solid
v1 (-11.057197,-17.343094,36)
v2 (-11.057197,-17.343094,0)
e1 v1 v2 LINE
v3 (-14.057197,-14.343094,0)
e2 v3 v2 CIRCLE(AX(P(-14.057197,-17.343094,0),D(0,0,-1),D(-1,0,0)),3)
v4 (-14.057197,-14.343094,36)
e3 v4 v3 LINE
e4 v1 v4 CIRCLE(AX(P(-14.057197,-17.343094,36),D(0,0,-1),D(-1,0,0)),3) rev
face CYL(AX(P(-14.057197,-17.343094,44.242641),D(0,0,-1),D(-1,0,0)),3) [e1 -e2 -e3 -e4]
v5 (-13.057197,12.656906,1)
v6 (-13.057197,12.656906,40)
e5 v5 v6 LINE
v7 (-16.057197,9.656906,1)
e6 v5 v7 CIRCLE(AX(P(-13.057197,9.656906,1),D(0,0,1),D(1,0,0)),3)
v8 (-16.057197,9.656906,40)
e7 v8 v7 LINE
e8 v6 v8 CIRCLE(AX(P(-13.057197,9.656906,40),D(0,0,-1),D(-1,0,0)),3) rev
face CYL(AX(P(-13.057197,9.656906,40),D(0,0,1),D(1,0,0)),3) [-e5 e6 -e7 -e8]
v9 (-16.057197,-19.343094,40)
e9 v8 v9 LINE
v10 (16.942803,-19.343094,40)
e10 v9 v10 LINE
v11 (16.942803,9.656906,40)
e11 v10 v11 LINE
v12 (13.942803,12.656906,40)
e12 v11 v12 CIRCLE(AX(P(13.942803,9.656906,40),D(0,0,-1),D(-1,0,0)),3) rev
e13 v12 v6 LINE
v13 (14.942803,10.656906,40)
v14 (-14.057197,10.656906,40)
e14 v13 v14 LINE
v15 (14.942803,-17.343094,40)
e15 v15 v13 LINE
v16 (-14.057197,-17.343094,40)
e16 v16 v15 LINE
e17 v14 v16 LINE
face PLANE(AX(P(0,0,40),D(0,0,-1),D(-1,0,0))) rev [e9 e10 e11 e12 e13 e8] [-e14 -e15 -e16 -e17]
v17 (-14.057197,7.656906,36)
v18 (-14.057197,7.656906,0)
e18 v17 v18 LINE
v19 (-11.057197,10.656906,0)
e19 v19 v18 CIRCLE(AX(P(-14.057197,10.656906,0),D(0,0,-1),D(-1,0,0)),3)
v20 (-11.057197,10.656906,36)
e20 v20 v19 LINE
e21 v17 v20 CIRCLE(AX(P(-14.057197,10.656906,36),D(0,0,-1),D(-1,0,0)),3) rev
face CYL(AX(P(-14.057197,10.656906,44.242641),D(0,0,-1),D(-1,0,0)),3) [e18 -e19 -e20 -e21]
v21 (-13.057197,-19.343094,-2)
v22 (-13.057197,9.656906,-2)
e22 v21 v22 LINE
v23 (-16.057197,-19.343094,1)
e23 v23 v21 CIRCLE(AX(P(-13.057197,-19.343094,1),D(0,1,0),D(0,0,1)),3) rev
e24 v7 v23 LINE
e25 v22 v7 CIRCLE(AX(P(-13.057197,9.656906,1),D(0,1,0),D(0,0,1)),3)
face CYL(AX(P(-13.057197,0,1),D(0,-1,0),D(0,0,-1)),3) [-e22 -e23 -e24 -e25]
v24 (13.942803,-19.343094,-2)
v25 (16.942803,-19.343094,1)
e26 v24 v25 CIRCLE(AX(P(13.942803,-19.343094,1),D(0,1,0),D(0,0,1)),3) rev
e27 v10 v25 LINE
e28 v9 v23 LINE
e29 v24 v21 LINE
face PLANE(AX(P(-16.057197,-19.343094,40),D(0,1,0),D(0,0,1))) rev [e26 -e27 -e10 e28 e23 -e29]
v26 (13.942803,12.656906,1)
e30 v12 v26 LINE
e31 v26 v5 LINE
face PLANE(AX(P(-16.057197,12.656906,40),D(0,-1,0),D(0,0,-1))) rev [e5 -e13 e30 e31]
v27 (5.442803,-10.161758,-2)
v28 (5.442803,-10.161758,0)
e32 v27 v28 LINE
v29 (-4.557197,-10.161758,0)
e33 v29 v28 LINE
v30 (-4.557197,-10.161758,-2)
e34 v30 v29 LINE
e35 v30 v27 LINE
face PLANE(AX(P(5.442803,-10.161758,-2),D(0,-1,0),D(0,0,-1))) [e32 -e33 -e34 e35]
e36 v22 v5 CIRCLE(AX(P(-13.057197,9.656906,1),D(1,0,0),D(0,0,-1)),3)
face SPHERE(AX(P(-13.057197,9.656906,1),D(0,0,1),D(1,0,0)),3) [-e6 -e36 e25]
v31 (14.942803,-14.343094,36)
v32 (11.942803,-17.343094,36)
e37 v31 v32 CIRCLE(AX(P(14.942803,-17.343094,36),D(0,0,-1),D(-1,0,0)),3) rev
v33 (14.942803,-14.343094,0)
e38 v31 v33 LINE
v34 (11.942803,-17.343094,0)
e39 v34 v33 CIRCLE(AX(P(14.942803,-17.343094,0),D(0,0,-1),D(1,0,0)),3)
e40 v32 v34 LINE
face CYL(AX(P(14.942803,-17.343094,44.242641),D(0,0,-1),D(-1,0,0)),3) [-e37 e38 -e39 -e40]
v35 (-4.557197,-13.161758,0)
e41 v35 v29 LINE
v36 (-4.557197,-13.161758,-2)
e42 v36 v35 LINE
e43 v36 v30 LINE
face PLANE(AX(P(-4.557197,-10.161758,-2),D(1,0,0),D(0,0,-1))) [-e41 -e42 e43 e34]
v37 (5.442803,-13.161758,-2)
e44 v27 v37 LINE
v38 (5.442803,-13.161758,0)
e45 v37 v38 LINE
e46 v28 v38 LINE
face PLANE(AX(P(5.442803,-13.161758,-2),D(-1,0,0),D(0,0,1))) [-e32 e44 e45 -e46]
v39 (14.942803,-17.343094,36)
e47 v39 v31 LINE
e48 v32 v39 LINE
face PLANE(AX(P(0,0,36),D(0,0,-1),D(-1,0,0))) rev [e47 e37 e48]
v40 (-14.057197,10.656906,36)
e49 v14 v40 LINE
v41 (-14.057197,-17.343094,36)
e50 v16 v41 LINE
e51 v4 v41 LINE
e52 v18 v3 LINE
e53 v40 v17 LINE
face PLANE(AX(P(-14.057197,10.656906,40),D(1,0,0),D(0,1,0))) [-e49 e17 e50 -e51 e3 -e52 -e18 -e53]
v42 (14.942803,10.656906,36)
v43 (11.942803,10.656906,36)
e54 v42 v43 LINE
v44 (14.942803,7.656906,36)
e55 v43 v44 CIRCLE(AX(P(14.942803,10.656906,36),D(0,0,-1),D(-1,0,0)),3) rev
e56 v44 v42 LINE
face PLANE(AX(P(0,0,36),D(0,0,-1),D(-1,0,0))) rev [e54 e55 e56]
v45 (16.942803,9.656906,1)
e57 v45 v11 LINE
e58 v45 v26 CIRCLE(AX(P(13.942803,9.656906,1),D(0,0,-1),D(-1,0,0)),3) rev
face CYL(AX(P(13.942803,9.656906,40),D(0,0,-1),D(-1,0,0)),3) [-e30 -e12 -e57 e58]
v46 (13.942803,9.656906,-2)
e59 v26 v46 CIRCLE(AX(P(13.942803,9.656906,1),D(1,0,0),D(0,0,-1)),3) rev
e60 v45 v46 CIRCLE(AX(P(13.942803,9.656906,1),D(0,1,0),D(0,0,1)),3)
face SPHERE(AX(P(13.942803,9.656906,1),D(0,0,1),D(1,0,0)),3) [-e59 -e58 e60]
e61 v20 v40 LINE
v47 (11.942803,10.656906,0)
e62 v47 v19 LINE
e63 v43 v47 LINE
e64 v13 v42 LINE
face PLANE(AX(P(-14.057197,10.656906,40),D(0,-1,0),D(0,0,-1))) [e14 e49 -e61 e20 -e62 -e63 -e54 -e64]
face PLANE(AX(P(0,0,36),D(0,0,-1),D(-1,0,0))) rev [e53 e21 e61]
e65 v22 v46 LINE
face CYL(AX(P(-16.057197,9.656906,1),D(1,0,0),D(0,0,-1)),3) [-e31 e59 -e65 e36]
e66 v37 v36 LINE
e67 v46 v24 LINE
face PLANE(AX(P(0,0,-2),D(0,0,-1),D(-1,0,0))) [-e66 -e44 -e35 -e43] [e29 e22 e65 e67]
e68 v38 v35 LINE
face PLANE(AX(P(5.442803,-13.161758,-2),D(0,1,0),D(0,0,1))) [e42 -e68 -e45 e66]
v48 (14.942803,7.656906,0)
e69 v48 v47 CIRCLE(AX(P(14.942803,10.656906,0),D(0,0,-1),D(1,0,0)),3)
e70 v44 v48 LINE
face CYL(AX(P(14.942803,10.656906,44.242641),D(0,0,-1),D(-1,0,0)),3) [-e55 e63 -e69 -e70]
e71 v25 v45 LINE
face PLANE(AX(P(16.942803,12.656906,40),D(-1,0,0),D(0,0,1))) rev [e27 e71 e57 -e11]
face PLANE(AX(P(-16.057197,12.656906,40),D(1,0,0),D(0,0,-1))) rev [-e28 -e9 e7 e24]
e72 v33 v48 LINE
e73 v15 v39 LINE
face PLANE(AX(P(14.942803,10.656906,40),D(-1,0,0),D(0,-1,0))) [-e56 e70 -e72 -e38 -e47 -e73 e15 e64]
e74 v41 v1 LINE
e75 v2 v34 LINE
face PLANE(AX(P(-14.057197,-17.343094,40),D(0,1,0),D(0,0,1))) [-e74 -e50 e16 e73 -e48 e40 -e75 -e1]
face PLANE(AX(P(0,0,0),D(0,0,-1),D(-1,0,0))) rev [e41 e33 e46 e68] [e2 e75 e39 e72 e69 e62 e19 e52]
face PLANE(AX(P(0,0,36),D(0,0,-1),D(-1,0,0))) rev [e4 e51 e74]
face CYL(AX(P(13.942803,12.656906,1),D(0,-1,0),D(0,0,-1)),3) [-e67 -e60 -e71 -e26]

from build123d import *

# Parameters (mm, degrees)
SKETCH_1_W      = 33
SKETCH_1_H      = 32
SKETCH_1_W_2    = 29
SKETCH_1_H_2    = 28
EXTRUDE_1_DEPTH = 40
SKETCH_2_W      = 33
SKETCH_2_H      = 32
SKETCH_2_W_2    = 10
SKETCH_2_H_2    = 3
EXTRUDE_2_DEPTH = 2
EXTRUDE_3_DEPTH = 36
FILLET_1_R      = 3
FILLET_2_R      = 3
FILLET_3_R      = 3


with BuildPart() as part:
    # 草图1 → 凸台-拉伸1 (new body)
    with BuildSketch(Plane.XY):
        with Locations((0.442802767, -3.343094476)):
            Rectangle(SKETCH_1_W, SKETCH_1_H)
        with Locations((0.442802767, -3.343094476)):
            Rectangle(SKETCH_1_W_2, SKETCH_1_H_2, mode=Mode.SUBTRACT)
    extrude(amount=EXTRUDE_1_DEPTH)

    # 草图2 → 凸台-拉伸2 (add)
    with BuildSketch(Plane(origin=(0, 0, 0), x_dir=(-1, 0, 0), z_dir=(0, 0, -1))):
        with Locations((-0.442802767, -3.343094476)):
            Rectangle(SKETCH_2_W, SKETCH_2_H)
        with Locations((-0.442802767, -11.661758268)):
            Rectangle(SKETCH_2_W_2, SKETCH_2_H_2, mode=Mode.SUBTRACT)
    extrude(amount=EXTRUDE_2_DEPTH)

    # 草图5 → 凸台-拉伸3 (add)
    with BuildSketch(Plane(origin=(0, 0, 0), x_dir=(-1, 0, 0), z_dir=(0, 0, -1))):
        with BuildLine():
            Line((11.057197233, 10.656905524), (14.057197233, 10.656905524))
            Line((14.057197233, 10.656905524), (14.057197233, 7.656905524))
            ThreePointArc((14.057197233, 7.656905524), (11.935876889, 8.535585181), (11.057197233, 10.656905524))
        make_face()
        with BuildLine():
            Line((-11.942802767, 10.656905524), (-14.942802767, 10.656905524))
            Line((-14.942802767, 10.656905524), (-14.942802767, 7.656905524))
            ThreePointArc((-14.942802767, 7.656905524), (-12.821482424, 8.535585181), (-11.942802767, 10.656905524))
        make_face()
        with BuildLine():
            Line((-14.942802767, -14.343094476), (-14.942802767, -17.343094476))
            Line((-14.942802767, -17.343094476), (-11.942802767, -17.343094476))
            ThreePointArc((-11.942802767, -17.343094476), (-12.821482424, -15.221774132), (-14.942802767, -14.343094476))
        make_face()
        with BuildLine():
            Line((11.057197233, -17.343094476), (14.057197233, -17.343094476))
            Line((14.057197233, -17.343094476), (14.057197233, -14.343094476))
            ThreePointArc((14.057197233, -14.343094476), (11.935876889, -15.221774132), (11.057197233, -17.343094476))
        make_face()
    extrude(amount=-EXTRUDE_3_DEPTH)

    # 圆角1
    fillet_1_edges = [part.edges().sort_by_distance(p)[0] for p in [
        (0.442802767, 12.656905524, -2),
        (16.942802767, 12.656905524, 19),
        (-16.057197233, 12.656905524, 19),
    ]]
    fillet(fillet_1_edges, radius=FILLET_1_R)

    # 圆角2
    # the kernel refuses this fillet: 3 mm, written as the material it takes off along each edge
    with BuildSketch(Plane(origin=(13.942802767, 9.656905524, 1), x_dir=(1, 0, 0), z_dir=(0, 0, -1))) as fillet_2_piece_1_section:
        Polygon((0, 0), (FILLET_2_R, 0), (FILLET_2_R, -FILLET_2_R), (0, -FILLET_2_R), align=None)
    fillet_2_piece_1 = extrude(amount=FILLET_2_R, mode=Mode.PRIVATE)
    fillet_2_piece_1 = fillet_2_piece_1 - Plane(origin=(13.942802767, 9.656905524, 1), x_dir=(-0.7071067811865475, -0.7071067811865475, 0), z_dir=(0, 0, -1)) * Sphere(FILLET_2_R, mode=Mode.PRIVATE)
    add(fillet_2_piece_1, mode=Mode.SUBTRACT)
    with BuildSketch(Plane(origin=(16.942802767, -26.843094476, -2), x_dir=(-1, 0, 0), z_dir=(0, 1, 0))) as fillet_2_piece_2:
        with BuildLine():
            CenterArc((FILLET_2_R, FILLET_2_R), FILLET_2_R, 180, 90)
            Line((0, FILLET_2_R), (0, 0))
            Line((0, 0), (FILLET_2_R, 0))
        make_face()
    extrude(amount=36.5, mode=Mode.SUBTRACT)

    # 圆角3
    # the kernel refuses this fillet: 3 mm, written as the material it takes off along each edge
    with BuildSketch(Plane(origin=(-13.057197233, 9.656905524, 1), x_dir=(0, 0, -1), z_dir=(-1, 0, 0))) as fillet_3_piece_1_section:
        Polygon((0, 0), (FILLET_3_R, 0), (FILLET_3_R, -FILLET_3_R), (0, -FILLET_3_R), align=None)
    fillet_3_piece_1 = extrude(amount=FILLET_3_R, mode=Mode.PRIVATE)
    fillet_3_piece_1 = fillet_3_piece_1 - Plane(origin=(-13.057197233, 9.656905524, 1), x_dir=(0, -0.7071067811865475, 0.7071067811865475), z_dir=(-1, 0, 0)) * Sphere(FILLET_3_R, mode=Mode.PRIVATE)
    add(fillet_3_piece_1, mode=Mode.SUBTRACT)
    with BuildSketch(Plane(origin=(-16.057197233, 9.656905524, -2), x_dir=(0, 0, 1), z_dir=(0, -1, 0))) as fillet_3_piece_2:
        with BuildLine():
            CenterArc((FILLET_3_R, -FILLET_3_R), FILLET_3_R, 90, 90)
            Line((0, -FILLET_3_R), (0, 0))
            Line((0, 0), (FILLET_3_R, 0))
        make_face()
    extrude(amount=36.5, mode=Mode.SUBTRACT)


solid = part.part
